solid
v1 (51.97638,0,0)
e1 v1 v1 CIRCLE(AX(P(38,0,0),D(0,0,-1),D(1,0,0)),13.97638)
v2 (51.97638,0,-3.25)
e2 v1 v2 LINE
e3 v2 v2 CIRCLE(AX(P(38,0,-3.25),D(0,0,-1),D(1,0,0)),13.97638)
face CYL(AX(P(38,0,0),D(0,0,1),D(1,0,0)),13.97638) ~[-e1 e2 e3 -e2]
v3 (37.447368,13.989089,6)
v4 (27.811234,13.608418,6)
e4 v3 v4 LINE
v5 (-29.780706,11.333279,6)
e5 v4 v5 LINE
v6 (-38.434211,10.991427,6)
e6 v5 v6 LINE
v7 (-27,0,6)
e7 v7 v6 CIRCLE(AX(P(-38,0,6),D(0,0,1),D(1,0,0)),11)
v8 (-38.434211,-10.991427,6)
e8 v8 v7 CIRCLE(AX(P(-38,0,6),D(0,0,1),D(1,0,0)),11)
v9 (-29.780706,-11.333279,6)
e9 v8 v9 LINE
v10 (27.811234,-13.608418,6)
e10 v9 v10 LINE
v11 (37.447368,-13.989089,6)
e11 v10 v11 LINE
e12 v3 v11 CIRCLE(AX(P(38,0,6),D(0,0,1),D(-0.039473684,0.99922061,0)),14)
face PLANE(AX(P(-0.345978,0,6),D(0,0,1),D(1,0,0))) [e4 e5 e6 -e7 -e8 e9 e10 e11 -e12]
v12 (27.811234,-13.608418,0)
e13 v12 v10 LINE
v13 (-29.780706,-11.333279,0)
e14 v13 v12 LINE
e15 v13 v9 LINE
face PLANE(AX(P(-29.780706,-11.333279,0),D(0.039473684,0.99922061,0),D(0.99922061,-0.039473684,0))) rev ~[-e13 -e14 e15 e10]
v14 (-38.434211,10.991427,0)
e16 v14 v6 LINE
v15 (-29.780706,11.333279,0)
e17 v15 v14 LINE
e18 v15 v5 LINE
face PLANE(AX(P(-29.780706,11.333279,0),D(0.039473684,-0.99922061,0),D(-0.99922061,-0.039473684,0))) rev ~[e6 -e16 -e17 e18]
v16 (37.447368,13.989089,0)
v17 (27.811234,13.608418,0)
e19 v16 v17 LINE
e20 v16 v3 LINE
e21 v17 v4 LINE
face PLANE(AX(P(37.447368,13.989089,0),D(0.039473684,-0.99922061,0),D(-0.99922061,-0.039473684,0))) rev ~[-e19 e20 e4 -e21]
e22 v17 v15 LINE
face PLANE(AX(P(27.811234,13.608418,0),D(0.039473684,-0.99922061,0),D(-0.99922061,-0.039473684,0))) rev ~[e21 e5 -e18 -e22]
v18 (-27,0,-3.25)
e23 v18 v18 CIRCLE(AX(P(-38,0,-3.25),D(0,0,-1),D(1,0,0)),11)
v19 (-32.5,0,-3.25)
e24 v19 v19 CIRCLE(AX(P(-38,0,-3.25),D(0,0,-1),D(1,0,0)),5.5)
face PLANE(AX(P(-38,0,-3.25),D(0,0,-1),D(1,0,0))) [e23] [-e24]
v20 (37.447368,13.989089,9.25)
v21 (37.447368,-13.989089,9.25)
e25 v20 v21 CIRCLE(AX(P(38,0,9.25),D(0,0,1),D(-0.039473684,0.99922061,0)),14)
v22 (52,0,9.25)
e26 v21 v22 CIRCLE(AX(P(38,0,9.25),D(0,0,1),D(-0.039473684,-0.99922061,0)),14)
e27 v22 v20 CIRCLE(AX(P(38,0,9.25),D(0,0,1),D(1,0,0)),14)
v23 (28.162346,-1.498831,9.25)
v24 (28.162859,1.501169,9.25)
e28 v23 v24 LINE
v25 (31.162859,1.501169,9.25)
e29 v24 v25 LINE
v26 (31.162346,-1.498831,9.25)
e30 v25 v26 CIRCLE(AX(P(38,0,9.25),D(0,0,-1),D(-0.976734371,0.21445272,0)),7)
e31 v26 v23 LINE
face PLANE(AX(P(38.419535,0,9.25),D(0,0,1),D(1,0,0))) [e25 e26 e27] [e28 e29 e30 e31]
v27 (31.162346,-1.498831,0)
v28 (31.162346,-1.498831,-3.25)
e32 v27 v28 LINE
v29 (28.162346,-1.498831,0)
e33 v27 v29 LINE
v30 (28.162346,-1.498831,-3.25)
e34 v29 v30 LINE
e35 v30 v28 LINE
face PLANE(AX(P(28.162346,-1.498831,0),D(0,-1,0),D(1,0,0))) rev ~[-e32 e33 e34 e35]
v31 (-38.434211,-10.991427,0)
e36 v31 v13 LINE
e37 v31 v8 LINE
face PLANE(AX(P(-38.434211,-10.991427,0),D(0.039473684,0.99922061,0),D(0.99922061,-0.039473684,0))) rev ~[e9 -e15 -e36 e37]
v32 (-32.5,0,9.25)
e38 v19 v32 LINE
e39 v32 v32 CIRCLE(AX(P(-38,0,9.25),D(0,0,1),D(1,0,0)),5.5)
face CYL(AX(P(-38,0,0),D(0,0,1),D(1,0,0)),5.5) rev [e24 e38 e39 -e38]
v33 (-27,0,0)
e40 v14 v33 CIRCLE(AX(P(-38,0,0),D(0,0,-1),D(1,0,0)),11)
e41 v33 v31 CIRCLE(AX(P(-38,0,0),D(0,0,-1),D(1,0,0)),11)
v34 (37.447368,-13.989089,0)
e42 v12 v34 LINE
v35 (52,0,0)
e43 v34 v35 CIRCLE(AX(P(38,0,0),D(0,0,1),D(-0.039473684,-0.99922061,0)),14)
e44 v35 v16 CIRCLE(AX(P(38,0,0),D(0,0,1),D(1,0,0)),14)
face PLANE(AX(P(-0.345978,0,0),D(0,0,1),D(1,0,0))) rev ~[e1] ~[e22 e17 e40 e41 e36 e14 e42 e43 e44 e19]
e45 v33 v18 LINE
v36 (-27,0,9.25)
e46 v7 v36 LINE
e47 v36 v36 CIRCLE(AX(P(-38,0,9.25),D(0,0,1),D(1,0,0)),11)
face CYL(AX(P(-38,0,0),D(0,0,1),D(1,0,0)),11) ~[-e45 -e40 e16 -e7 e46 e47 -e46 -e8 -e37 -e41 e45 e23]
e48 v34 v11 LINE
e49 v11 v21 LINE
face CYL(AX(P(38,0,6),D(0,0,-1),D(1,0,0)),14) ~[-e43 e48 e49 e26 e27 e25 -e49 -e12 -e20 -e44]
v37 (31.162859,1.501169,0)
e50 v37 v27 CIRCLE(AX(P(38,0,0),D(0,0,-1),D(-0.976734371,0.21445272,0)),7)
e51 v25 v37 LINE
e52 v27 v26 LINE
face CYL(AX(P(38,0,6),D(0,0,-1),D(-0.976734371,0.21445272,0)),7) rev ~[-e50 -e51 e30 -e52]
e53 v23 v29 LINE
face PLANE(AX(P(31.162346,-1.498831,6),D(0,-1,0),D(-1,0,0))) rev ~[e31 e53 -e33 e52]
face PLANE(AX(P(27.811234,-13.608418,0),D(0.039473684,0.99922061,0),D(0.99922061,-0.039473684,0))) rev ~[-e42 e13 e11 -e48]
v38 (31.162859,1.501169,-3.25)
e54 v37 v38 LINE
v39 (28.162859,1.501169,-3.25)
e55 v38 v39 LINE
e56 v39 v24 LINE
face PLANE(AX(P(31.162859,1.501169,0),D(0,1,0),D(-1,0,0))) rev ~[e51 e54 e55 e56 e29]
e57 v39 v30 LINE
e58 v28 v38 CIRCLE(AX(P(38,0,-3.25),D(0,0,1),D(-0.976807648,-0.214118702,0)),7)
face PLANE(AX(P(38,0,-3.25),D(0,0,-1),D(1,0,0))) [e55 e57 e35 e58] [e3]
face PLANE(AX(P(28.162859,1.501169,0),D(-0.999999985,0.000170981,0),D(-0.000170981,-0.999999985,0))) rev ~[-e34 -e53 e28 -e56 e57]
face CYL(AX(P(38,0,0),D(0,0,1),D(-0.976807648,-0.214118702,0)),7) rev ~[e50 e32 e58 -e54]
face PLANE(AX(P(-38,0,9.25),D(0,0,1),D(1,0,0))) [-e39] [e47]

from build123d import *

# Parameters (mm, degrees)
F0_R     = 5.5
F1_DEPTH = 6
F4_DEPTH = 3.25
F2_R     = 13.9763796755
F5_DEPTH = 3.25
F3_R     = 5.5
F6_DEPTH = 3.25
F7_R     = 5.5
F8_DEPTH = 3.25


with BuildPart() as f1:
    # F0 (on Top) → F1 (new body)
    with BuildSketch(Plane.XY):
        with BuildLine():
            ThreePointArc((27.8112338211, -13.6084181209), (21, 0), (27.8112338211, 13.6084181209))
            Line((27.8112338211, 13.6084181209), (-29.7807062004, 11.3332788475))
            ThreePointArc((-29.7807062004, 11.3332788475), (-24, 0), (-29.7807062004, -11.3332788475))
            Line((-29.7807062004, -11.3332788475), (27.8112338211, -13.6084181209))
        make_face()
        with BuildLine():
            ThreePointArc((-29.7807062004, -11.3332788475), (-24, 0), (-29.7807062004, 11.3332788475))
            Line((-29.7807062004, 11.3332788475), (-38.4342105263, 10.9914267144))
            ThreePointArc((-38.4342105263, 10.9914267144), (-30.3768876366, 7.9302054131), (-27, 0))
            ThreePointArc((-27, 0), (-30.3768876366, -7.9302054131), (-38.4342105263, -10.9914267144))
            Line((-38.4342105263, -10.9914267144), (-29.7807062004, -11.3332788475))
        make_face()
        with BuildLine():
            ThreePointArc((-27, 0), (-30.3768876366, 7.9302054131), (-38.4342105263, 10.9914267144))
            ThreePointArc((-38.4342105263, 10.9914267144), (-49, 0), (-38.4342105263, -10.9914267144))
            ThreePointArc((-38.4342105263, -10.9914267144), (-30.3768876366, -7.9302054131), (-27, 0))
        make_face()
        with Locations((-38, 0)):
            Circle(F0_R, mode=Mode.SUBTRACT)
        with BuildLine():
            ThreePointArc((37.4473684211, -13.9890885456), (24, 0), (37.4473684211, 13.9890885456))
            Line((37.4473684211, 13.9890885456), (27.8112338211, 13.6084181209))
            ThreePointArc((27.8112338211, 13.6084181209), (21, 0), (27.8112338211, -13.6084181209))
            Line((27.8112338211, -13.6084181209), (37.4473684211, -13.9890885456))
        make_face()
        with BuildLine():
            ThreePointArc((37.4473684211, -13.9890885456), (47.702143008, -10.0929887076), (52, 0))
            ThreePointArc((52, 0), (47.702143008, 10.0929887076), (37.4473684211, 13.9890885456))
            ThreePointArc((37.4473684211, 13.9890885456), (24, 0), (37.4473684211, -13.9890885456))
        make_face()
        with BuildLine():
            ThreePointArc((31.1628594053, 1.5011690405), (44.9999998977, -0.0011968644), (31.1623464634, -1.4988309156))
            Line((31.1623464634, -1.4988309156), (28.1623464634, -1.4988309156))
            Line((28.1623464634, -1.4988309156), (28.1628594053, 1.5011690405))
            Line((28.1628594053, 1.5011690405), (31.1628594053, 1.5011690405))
        make_face(mode=Mode.SUBTRACT)
    extrude(amount=F1_DEPTH)

    # F3 (on face) → F4 (join)
    with BuildSketch(Plane.XY.offset(6)):
        with BuildLine():
            ThreePointArc((52, 0), (47.702143008, 10.0929887076), (37.4473684211, 13.9890885456))
            ThreePointArc((37.4473684211, 13.9890885456), (24, 0), (37.4473684211, -13.9890885456))
            ThreePointArc((37.4473684211, -13.9890885456), (47.702143008, -10.0929887076), (52, 0))
        make_face()
        with BuildLine():
            Line((31.1623464634, -1.4988309156), (28.1623464634, -1.4988309156))
            Line((28.1623464634, -1.4988309156), (28.1628594053, 1.5011690405))
            Line((28.1628594053, 1.5011690405), (31.1628594053, 1.5011690405))
            ThreePointArc((31.1628594053, 1.5011690405), (44.9999998977, -0.0011968644), (31.1623464634, -1.4988309156))
        make_face(mode=Mode.SUBTRACT)
    extrude(amount=F4_DEPTH)

    # F2 (on face) → F5 (join)
    with BuildSketch(Plane(origin=(0, 0, 0), x_dir=(1, 0, 0), z_dir=(0, 0, -1))):
        with Locations((38, 0)):
            Circle(F2_R)
        with BuildLine():
            Line((28.1623464634, 1.4988309156), (31.1623464634, 1.4988309156))
            ThreePointArc((31.1623464634, 1.4988309156), (44.9999998977, 0.0011968644), (31.1628594053, -1.5011690405))
            Line((31.1628594053, -1.5011690405), (28.1628594053, -1.5011690405))
            Line((28.1628594053, -1.5011690405), (28.1623464634, 1.4988309156))
        make_face(mode=Mode.SUBTRACT)
    extrude(amount=F5_DEPTH)

    # F3 (on face) → F6 (join)
    with BuildSketch(Plane.XY.offset(6)):
        with BuildLine():
            ThreePointArc((-38.4342105263, -10.9914267144), (-30.3768876366, -7.9302054131), (-27, 0))
            ThreePointArc((-27, 0), (-30.3768876366, 7.9302054131), (-38.4342105263, 10.9914267144))
            ThreePointArc((-38.4342105263, 10.9914267144), (-49, 0), (-38.4342105263, -10.9914267144))
        make_face()
        with Locations((-38, 0)):
            Circle(F3_R, mode=Mode.SUBTRACT)
    extrude(amount=F6_DEPTH)

    # F7 (on face) → F8 (join)
    with BuildSketch(Plane(origin=(0, 0, 0), x_dir=(1, 0, 0), z_dir=(0, 0, -1))):
        with BuildLine():
            ThreePointArc((-38.4342105263, -10.9914267144), (-30.3768876366, -7.9302054131), (-27, 0))
            ThreePointArc((-27, 0), (-30.3768876366, 7.9302054131), (-38.4342105263, 10.9914267144))
            ThreePointArc((-38.4342105263, 10.9914267144), (-49, 0), (-38.4342105263, -10.9914267144))
        make_face()
        with Locations((-38, 0)):
            Circle(F7_R, mode=Mode.SUBTRACT)
    extrude(amount=F8_DEPTH)


solid = f1.part
